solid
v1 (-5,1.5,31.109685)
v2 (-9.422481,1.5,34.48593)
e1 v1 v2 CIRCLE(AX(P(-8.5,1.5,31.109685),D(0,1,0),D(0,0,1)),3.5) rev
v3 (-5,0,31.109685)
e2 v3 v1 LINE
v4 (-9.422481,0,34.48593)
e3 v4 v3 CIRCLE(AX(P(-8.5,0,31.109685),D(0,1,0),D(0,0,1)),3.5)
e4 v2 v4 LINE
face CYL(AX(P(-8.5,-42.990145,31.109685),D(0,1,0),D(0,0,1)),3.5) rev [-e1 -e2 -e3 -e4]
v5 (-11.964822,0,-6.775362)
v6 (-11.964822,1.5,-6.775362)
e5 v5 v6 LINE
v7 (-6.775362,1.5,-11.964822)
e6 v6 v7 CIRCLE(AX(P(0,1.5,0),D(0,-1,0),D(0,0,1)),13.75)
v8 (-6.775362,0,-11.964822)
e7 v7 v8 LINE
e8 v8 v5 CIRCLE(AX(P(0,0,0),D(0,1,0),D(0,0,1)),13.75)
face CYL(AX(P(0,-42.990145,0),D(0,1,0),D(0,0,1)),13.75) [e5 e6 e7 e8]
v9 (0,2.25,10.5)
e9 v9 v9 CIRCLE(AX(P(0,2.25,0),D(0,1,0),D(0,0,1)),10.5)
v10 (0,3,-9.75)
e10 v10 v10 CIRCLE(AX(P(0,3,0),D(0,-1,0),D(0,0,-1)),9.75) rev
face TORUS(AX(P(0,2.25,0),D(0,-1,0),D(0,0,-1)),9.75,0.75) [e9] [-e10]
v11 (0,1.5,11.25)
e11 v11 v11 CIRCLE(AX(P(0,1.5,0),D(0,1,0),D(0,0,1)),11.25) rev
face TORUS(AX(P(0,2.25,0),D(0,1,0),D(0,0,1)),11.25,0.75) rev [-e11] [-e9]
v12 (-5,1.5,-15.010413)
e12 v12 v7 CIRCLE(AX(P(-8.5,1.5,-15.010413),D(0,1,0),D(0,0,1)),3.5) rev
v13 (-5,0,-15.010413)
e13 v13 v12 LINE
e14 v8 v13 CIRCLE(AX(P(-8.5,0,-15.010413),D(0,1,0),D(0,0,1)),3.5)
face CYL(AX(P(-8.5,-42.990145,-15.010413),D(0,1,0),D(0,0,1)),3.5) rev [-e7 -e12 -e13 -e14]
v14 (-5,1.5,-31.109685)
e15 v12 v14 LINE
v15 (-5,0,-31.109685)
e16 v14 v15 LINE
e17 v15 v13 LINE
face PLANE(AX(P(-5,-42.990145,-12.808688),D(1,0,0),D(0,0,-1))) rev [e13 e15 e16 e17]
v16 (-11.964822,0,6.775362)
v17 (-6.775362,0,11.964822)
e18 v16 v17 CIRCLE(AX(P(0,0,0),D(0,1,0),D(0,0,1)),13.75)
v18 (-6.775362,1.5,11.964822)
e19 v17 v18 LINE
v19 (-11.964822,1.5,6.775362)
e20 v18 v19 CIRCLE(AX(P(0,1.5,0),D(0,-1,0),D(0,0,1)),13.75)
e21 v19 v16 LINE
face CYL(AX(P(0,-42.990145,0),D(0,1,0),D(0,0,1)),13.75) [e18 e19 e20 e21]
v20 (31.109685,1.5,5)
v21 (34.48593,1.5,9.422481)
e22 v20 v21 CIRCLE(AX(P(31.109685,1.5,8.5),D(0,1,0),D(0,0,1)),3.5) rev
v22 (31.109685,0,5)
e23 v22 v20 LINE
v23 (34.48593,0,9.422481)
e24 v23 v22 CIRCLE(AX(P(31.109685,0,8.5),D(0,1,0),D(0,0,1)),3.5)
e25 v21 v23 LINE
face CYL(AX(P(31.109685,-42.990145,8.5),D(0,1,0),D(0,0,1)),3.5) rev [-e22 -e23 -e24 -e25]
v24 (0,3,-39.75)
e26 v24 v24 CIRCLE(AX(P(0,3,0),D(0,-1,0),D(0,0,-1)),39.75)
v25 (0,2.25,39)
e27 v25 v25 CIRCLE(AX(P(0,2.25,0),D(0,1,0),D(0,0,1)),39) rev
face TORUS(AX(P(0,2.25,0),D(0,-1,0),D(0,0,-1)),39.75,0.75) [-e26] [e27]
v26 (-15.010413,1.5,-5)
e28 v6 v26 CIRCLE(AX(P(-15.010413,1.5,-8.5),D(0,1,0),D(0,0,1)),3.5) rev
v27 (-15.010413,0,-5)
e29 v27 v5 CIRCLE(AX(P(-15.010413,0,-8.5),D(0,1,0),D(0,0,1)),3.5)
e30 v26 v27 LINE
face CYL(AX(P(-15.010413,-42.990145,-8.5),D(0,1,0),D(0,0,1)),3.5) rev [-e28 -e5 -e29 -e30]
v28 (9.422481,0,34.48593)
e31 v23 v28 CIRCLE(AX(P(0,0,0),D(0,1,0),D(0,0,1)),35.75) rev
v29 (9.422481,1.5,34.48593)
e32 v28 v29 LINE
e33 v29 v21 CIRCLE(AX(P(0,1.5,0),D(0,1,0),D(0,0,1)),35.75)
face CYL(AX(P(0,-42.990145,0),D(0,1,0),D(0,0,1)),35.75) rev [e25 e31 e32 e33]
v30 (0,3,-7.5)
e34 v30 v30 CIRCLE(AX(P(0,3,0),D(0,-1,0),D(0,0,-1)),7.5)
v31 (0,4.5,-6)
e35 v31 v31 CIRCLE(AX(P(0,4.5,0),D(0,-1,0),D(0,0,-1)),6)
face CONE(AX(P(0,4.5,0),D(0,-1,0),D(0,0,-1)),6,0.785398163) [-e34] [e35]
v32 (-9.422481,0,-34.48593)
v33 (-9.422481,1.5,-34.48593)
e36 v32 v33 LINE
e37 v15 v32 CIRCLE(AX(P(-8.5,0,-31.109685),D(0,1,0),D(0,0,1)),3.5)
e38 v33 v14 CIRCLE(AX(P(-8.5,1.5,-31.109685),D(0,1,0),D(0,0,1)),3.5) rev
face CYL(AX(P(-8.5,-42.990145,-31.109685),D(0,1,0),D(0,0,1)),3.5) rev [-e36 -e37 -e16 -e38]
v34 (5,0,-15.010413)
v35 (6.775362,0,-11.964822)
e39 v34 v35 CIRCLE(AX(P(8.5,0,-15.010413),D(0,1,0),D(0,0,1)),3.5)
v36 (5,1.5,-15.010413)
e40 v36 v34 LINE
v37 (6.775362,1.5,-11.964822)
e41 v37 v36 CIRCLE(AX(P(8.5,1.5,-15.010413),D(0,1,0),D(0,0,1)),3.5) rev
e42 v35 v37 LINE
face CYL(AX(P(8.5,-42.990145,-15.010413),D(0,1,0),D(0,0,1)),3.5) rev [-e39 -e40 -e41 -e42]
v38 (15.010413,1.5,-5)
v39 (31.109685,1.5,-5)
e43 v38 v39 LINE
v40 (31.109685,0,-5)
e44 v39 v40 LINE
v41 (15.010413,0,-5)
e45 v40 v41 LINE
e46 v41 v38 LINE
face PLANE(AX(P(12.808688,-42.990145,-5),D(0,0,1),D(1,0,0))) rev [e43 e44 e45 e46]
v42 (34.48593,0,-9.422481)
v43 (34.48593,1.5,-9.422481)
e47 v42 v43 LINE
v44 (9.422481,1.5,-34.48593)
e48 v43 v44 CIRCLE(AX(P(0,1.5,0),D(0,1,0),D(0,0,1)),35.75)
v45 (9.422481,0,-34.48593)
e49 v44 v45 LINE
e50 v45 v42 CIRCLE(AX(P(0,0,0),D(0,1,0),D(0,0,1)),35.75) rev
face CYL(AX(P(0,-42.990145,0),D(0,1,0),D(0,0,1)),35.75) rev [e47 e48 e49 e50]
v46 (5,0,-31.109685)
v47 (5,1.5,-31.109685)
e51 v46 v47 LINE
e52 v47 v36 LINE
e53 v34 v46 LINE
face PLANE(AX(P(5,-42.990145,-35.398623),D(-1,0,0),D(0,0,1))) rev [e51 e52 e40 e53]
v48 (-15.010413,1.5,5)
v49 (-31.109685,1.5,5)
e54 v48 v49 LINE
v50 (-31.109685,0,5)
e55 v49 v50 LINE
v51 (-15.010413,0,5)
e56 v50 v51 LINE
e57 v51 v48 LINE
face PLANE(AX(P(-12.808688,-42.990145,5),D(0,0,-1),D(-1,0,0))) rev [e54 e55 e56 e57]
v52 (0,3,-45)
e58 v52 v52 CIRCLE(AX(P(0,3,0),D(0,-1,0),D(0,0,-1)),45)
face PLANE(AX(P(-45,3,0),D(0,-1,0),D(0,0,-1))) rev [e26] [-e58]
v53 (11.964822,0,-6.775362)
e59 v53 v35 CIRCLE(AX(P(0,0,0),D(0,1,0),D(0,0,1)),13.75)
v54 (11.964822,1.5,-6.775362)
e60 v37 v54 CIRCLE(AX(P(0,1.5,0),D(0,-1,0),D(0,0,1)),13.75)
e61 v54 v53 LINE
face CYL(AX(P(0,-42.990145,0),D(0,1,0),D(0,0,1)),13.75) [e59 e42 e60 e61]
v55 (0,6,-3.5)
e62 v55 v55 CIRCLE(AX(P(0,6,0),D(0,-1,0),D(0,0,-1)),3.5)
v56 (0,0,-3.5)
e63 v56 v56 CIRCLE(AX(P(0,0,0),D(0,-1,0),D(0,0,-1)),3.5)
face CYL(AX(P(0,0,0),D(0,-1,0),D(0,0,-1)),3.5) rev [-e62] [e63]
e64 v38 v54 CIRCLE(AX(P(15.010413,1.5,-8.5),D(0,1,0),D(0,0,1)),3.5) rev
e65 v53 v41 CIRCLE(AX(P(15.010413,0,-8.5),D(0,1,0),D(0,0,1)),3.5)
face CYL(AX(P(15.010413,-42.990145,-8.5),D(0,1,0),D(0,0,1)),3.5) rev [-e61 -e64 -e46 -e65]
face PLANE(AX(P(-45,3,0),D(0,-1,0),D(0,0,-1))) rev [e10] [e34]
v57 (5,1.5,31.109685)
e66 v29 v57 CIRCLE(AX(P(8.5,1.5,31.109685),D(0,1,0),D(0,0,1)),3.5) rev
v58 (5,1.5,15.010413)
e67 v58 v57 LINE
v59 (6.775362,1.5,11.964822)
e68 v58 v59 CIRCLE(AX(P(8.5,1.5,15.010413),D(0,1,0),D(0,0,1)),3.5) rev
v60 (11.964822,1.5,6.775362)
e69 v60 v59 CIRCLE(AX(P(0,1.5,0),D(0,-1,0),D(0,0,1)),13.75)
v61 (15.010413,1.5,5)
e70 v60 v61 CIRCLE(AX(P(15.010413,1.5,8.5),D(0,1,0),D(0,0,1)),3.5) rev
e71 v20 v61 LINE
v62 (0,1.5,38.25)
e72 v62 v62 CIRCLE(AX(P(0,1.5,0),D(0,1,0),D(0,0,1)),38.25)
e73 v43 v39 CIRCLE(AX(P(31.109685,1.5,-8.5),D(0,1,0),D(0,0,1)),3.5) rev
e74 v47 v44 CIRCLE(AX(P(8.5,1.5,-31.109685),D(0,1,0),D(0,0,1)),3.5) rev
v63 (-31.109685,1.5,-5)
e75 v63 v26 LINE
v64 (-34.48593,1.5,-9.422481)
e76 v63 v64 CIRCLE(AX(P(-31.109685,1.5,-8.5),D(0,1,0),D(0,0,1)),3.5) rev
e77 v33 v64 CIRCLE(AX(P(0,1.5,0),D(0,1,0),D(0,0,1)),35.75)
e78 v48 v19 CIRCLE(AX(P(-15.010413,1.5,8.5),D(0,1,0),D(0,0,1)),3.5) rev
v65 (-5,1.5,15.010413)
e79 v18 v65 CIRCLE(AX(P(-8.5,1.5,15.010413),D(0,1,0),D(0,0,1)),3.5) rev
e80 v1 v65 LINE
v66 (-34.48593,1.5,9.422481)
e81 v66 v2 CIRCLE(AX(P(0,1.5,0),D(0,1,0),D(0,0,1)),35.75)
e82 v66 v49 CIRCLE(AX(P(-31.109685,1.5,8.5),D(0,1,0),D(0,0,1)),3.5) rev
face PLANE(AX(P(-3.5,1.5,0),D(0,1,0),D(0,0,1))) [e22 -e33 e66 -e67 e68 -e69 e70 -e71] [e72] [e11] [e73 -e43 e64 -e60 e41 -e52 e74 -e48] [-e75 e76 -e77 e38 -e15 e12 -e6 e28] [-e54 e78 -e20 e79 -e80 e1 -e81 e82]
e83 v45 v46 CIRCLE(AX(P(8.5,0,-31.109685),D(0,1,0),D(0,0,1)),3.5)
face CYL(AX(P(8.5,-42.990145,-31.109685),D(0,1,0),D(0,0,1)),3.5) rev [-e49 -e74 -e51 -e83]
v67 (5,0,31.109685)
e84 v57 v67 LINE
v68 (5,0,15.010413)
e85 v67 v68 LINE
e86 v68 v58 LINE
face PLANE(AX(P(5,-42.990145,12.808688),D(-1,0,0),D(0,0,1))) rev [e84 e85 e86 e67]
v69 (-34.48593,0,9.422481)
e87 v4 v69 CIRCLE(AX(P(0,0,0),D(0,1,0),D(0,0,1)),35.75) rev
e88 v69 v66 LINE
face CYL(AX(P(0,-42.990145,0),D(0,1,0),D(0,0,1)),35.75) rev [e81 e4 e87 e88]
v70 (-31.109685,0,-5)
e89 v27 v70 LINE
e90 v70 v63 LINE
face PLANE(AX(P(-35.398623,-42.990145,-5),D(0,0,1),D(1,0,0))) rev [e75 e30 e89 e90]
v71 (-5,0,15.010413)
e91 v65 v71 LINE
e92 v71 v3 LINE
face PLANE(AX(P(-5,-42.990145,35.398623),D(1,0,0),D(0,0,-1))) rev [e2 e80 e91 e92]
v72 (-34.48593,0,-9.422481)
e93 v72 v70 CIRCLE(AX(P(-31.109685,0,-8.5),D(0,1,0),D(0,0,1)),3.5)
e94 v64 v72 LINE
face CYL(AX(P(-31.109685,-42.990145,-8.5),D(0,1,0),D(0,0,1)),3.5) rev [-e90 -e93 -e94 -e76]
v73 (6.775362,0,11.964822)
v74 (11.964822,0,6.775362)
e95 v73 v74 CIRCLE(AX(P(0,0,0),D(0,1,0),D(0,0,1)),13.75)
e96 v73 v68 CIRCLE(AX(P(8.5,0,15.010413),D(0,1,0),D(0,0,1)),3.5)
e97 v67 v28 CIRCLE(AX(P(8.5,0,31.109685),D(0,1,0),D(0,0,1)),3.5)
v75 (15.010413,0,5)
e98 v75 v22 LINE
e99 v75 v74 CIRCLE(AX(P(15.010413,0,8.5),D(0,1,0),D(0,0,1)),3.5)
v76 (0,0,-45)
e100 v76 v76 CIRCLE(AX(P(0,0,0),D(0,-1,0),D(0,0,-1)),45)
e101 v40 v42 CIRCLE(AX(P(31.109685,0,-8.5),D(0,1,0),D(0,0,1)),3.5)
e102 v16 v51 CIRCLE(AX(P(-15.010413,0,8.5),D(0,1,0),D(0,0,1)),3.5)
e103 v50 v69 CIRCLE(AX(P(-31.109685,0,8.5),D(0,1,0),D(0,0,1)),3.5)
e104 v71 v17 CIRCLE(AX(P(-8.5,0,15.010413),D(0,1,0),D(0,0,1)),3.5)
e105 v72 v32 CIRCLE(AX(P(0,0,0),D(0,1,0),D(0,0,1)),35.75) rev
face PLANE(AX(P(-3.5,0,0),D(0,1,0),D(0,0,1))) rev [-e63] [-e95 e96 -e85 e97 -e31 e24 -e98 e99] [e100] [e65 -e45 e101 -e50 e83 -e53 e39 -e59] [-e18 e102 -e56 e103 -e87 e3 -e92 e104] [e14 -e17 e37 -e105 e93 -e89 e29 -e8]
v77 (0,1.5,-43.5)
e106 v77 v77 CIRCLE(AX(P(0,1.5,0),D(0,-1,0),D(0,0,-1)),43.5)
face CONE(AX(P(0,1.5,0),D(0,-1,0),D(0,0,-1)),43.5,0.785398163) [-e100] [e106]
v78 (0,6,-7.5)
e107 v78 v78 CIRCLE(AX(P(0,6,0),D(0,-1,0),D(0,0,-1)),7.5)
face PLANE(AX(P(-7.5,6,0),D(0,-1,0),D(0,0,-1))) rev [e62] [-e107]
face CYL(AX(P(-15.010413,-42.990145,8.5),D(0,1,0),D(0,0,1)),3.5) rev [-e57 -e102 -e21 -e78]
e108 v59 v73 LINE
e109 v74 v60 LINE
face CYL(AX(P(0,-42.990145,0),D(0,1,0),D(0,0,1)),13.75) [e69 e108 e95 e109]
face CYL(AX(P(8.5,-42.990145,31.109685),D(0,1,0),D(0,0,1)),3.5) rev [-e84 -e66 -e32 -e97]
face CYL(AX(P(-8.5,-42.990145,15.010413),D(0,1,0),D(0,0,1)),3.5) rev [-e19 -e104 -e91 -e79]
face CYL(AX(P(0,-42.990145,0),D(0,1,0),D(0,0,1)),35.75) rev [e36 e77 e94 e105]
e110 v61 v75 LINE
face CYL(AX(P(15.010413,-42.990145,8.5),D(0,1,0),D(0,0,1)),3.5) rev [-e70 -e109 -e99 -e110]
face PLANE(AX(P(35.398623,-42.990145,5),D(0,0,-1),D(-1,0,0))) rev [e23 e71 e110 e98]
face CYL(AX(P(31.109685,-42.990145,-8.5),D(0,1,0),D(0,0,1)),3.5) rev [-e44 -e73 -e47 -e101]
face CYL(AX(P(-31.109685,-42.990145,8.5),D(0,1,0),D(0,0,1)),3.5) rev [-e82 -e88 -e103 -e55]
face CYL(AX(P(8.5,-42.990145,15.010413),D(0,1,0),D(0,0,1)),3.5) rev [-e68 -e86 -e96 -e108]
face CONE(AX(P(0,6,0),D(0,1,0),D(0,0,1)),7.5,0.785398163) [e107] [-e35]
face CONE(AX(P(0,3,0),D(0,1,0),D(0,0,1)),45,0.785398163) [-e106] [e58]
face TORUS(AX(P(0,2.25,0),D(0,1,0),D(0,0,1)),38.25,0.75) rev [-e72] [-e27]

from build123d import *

# Parameters (mm, degrees)
SKETCH2_R          = 39
SKETCH2_R_2        = 10.5
CUT_EXTRUDE1_DEPTH = 1.5
FILLET1_R          = 0.75
CUT_EXTRUDE2_DEPTH = 1.5
FILLET2_R          = 3.5


with BuildPart() as part:
    # Sketch1 → Revolve1 (revolve)
    with BuildSketch(Plane.XY, mode=Mode.PRIVATE) as revolve1_sk:
        Polygon((-3.5, 6), (-3.5, 0), (-45, 0), (-43.5, 1.5), (-45, 3), (-7.5, 3), (-6, 4.5), (-7.5, 6), align=None)
    revolve(revolve1_sk.sketch.rotate(Axis((0, 0, 0), (0, 1, 0)), 270), axis=Axis((0, 0, 0), (0, 1, 0)))

    # Sketch2 → Cut-Extrude1 (cut)
    with BuildSketch(Plane(origin=(0, 3, 0), x_dir=(1, 0, 0), z_dir=(0, 1, 0))):
        with Locations(Location((0, 0, 0), (0, 0, 270))):
            Circle(SKETCH2_R)
        with Locations(Location((0, 0, 0), (0, 0, 270))):
            Circle(SKETCH2_R_2, mode=Mode.SUBTRACT)
    extrude(amount=-CUT_EXTRUDE1_DEPTH, mode=Mode.SUBTRACT)

    # Fillet1
    fillet1_edges = [part.edges().sort_by_distance(p)[0] for p in [
        (0, 1.5, -10.5),
        (0, 1.5, -39),
    ]]
    fillet(fillet1_edges, radius=FILLET1_R)
    fillet1_2_edges = [part.edges().sort_by_distance(p)[0] for p in [
        (0, 3, -39),
        (0, 3, -10.5),
    ]]
    fillet(fillet1_2_edges, radius=FILLET1_R - 0.0001)  # a hair under: the kernel refuses the full size

    # Sketch3 → Cut-Extrude2 (cut)
    with BuildSketch(Plane(origin=(0, 1.5, 0), x_dir=(1, 0, 0), z_dir=(0, 1, 0))):
        with BuildLine():
            Line((35.398622855, -5), (12.808688457, -5))
            ThreePointArc((12.808688457, -5), (9.722718241, -9.722718241), (5, -12.808688457))
            Line((5, -12.808688457), (5, -35.398622855))
            ThreePointArc((5, -35.398622855), (25.279067427, -25.279067427), (35.398622855, -5))
        make_face()
        with BuildLine():
            Line((-5, -35.398622855), (-5, -12.808688457))
            ThreePointArc((-5, -12.808688457), (-9.722718241, -9.722718241), (-12.808688457, -5))
            Line((-12.808688457, -5), (-35.398622855, -5))
            ThreePointArc((-35.398622855, -5), (-25.279067427, -25.279067427), (-5, -35.398622855))
        make_face()
        with BuildLine():
            Line((-35.398622855, 5), (-12.808688457, 5))
            ThreePointArc((-12.808688457, 5), (-9.722718241, 9.722718241), (-5, 12.808688457))
            Line((-5, 12.808688457), (-5, 35.398622855))
            ThreePointArc((-5, 35.398622855), (-25.279067427, 25.279067427), (-35.398622855, 5))
        make_face()
        with BuildLine():
            Line((5, 35.398622855), (5, 12.808688457))
            ThreePointArc((5, 12.808688457), (9.722718241, 9.722718241), (12.808688457, 5))
            Line((12.808688457, 5), (35.398622855, 5))
            ThreePointArc((35.398622855, 5), (25.279067427, 25.279067427), (5, 35.398622855))
        make_face()
    extrude(amount=-CUT_EXTRUDE2_DEPTH, mode=Mode.SUBTRACT)

    # Fillet2
    fillet2_edges = [part.edges().sort_by_distance(p)[0] for p in [
        (5, 0.75, -35.398622855),
        (35.398622855, 0.75, -5),
        (12.808688457, 0.75, -5),
        (5, 0.75, -12.808688457),
        (-5, 0.75, -12.808688457),
        (-12.808688457, 0.75, -5),
        (-35.398622855, 0.75, -5),
        (-5, 0.75, -35.398622855),
        (-12.808688457, 0.75, 5),
        (-5, 0.75, 12.808688457),
        (-5, 0.75, 35.398622855),
        (-35.398622855, 0.75, 5),
        (35.398622855, 0.75, 5),
        (5, 0.75, 35.398622855),
        (5, 0.75, 12.808688457),
        (12.808688457, 0.75, 5),
    ]]
    fillet(fillet2_edges, radius=FILLET2_R)


solid = part.part
